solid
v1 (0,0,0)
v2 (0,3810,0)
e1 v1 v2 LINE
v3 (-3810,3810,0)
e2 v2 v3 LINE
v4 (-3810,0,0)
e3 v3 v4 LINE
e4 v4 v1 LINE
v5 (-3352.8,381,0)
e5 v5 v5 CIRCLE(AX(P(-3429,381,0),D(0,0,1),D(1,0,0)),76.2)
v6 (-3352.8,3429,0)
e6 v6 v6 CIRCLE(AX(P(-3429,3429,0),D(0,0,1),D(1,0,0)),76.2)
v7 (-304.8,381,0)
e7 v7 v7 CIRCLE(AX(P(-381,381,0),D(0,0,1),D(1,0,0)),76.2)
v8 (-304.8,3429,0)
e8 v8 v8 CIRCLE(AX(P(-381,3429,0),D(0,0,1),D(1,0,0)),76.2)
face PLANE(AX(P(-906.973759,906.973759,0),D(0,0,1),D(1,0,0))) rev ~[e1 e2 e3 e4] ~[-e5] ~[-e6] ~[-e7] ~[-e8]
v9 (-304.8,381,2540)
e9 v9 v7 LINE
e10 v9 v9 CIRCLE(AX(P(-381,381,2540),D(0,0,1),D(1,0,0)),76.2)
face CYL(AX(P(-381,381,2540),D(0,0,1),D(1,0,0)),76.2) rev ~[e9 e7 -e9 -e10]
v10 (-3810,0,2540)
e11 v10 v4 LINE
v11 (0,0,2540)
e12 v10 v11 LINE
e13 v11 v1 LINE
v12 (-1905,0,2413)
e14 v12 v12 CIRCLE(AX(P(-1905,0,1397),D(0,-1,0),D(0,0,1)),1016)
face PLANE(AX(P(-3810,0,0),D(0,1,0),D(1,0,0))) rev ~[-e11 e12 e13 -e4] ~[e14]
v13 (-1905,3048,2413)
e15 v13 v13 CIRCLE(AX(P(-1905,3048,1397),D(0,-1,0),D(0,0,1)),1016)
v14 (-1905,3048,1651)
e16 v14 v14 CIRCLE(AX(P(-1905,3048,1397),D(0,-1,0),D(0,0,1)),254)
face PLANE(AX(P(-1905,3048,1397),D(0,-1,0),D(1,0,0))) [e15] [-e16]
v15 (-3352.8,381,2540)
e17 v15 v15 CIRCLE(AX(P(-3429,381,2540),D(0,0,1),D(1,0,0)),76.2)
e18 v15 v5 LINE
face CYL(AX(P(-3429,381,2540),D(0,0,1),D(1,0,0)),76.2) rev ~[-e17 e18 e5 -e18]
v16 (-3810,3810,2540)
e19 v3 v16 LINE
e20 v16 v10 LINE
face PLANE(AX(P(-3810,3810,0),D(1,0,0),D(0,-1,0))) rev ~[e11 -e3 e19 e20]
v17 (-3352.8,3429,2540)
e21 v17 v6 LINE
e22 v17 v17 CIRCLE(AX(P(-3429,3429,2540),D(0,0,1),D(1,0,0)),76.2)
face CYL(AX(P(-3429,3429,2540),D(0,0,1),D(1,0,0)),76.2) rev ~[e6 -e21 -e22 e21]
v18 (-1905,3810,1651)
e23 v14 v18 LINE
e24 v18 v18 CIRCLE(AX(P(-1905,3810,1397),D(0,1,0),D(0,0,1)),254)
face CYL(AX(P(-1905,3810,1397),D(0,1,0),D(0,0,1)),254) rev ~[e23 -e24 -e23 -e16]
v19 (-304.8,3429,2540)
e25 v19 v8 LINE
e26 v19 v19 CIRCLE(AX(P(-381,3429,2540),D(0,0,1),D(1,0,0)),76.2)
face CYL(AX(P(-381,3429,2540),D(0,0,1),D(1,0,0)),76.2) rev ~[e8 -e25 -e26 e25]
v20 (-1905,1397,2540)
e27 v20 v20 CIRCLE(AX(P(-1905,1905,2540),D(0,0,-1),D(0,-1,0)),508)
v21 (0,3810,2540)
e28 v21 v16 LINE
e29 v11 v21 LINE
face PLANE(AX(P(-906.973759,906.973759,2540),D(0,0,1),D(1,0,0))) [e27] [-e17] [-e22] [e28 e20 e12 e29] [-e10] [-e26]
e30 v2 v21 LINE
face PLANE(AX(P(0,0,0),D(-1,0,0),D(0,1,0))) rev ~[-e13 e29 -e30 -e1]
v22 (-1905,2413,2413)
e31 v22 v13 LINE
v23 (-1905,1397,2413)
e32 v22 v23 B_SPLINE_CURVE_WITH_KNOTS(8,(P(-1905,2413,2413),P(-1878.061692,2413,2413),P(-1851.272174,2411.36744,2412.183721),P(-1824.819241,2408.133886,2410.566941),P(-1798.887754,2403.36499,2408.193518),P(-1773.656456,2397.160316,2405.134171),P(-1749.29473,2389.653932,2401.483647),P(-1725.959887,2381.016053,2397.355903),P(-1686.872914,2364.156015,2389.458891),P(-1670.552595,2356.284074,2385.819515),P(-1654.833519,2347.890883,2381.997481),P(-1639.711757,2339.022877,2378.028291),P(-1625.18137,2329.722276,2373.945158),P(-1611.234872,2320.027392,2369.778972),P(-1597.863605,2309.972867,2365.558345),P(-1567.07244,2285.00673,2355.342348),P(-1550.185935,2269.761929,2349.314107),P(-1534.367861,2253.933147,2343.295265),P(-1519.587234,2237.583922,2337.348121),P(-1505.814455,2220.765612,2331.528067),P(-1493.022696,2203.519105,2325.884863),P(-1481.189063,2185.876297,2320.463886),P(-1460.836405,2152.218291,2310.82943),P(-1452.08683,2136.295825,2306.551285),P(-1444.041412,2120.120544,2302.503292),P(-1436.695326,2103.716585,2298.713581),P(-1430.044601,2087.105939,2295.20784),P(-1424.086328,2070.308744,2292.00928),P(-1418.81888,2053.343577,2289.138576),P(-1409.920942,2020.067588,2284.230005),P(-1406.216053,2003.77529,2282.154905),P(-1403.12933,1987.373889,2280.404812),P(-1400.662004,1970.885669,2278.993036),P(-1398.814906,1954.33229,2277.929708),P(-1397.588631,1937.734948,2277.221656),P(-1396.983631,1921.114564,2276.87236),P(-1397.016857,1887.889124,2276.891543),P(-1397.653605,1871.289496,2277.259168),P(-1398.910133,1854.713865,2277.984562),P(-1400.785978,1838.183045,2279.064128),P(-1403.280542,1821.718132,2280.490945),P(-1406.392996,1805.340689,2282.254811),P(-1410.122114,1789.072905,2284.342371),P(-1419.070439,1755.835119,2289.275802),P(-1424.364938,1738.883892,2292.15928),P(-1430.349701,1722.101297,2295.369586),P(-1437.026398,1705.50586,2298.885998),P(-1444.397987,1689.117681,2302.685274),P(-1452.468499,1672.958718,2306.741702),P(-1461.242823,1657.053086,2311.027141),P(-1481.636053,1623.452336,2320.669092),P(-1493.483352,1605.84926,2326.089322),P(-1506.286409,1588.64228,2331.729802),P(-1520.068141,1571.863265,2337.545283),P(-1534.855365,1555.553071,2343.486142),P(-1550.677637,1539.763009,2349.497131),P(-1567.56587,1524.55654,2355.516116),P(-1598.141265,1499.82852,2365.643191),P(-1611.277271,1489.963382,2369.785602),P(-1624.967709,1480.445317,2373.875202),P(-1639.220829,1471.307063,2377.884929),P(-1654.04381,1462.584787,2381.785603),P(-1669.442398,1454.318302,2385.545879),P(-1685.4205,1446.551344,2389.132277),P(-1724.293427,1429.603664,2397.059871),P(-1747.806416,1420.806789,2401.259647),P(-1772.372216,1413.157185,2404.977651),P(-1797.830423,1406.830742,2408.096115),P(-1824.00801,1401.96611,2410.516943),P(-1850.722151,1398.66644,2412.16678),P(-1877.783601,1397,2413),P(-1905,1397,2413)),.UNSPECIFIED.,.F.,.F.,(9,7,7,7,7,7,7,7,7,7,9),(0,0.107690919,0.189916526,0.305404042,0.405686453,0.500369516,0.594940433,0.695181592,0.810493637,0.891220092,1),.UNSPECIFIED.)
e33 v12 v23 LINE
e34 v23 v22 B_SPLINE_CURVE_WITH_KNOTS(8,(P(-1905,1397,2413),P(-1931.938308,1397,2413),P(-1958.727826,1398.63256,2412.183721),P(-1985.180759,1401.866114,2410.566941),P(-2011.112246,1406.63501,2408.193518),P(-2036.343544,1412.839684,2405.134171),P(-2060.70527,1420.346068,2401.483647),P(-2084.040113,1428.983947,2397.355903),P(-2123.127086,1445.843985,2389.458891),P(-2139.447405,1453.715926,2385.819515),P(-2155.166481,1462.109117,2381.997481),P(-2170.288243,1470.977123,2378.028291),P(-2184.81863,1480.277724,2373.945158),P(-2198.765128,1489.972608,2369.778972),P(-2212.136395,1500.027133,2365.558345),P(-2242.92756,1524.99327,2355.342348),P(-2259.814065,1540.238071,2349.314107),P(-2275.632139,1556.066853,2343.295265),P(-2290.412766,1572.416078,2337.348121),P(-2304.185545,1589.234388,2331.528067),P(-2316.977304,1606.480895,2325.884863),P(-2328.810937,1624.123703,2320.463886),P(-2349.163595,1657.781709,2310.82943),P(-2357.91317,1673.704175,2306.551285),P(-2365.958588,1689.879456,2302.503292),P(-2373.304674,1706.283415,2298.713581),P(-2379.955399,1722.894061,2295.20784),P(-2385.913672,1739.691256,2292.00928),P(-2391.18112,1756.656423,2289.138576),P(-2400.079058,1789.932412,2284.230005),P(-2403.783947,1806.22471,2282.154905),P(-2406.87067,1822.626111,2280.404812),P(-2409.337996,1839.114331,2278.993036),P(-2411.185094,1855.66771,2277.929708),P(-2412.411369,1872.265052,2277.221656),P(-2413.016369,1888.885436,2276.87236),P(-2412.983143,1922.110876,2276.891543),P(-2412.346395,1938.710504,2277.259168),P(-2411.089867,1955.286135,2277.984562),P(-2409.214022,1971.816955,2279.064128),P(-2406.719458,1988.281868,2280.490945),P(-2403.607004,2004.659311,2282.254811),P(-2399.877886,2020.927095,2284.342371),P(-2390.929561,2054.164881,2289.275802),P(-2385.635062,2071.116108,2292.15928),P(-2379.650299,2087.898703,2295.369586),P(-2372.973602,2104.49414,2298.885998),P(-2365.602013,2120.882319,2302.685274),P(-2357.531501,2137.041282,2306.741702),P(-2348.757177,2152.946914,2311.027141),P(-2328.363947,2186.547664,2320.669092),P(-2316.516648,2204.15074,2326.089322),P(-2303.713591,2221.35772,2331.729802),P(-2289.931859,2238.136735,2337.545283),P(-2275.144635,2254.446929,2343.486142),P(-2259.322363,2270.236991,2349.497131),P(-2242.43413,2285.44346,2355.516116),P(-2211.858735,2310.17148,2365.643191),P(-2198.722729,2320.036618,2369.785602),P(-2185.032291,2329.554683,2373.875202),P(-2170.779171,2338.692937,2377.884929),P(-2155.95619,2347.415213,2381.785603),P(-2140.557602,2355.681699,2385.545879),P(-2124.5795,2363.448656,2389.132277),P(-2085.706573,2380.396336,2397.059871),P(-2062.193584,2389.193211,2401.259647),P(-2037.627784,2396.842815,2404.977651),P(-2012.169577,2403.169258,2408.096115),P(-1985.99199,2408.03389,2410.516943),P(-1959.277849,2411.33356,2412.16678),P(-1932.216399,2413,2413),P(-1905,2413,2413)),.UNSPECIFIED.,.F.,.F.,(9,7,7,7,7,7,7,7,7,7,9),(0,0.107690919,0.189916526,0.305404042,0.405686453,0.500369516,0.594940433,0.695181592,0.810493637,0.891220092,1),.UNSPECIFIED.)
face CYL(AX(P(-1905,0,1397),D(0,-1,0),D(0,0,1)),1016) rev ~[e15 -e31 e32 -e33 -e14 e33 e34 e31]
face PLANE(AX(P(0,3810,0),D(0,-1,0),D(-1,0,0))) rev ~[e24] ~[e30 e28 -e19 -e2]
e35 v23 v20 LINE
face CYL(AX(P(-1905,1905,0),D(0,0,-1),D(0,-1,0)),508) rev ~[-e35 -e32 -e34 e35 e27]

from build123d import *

# Parameters (mm, degrees)
F1_DEPTH  = 2540
F2_W      = 3810
F2_H      = 3810
F2_R      = 508
F3_DEPTH  = 762
F5_DEPTH  = 3048
F7_DEPTH  = 3810.0010001
F8_R      = 254
F9_DEPTH  = 508
F11_DEPTH = 2540.001


with BuildPart() as f1:
    # F0 (on Top) → F1 (new body)
    with BuildSketch(Plane.XY):
        with BuildLine():
            Line((-1905, 0), (0, 0))
            Line((0, 0), (0, 1905))
            Line((0, 1905), (-1397, 1905))
            ThreePointArc((-1397, 1905), (-1545.7897551572, 1545.7897551572), (-1905, 1397))
            Line((-1905, 1397), (-1905, 0))
        make_face()
        with BuildLine():
            Line((-3810, 0), (-1905, 0))
            Line((-1905, 0), (-1905, 1397))
            ThreePointArc((-1905, 1397), (-2264.2102448428, 2264.2102448428), (-1397, 1905))
            Line((-1397, 1905), (0, 1905))
            Line((0, 1905), (0, 3810))
            Line((0, 3810), (-3810, 3810))
            Line((-3810, 3810), (-3810, 0))
        make_face()
    extrude(amount=F1_DEPTH)

    # F2 (on face) → F3 (join)
    with BuildSketch(Plane(origin=(0, 0, 0), x_dir=(1, 0, 0), z_dir=(0, 0, -1))):
        with Locations((-1905, -1905)):
            Rectangle(F2_W, F2_H)
        with Locations((-1905, -1905)):
            Circle(F2_R, mode=Mode.SUBTRACT)
        with Locations((-1905, -1905)):
            Circle(F2_R)
    extrude(amount=-F3_DEPTH)

    # F4 (on face) → F5 (cut)
    with BuildSketch(Plane.XZ):
        with BuildLine():
            ThreePointArc((-889, 1397), (-1186.5795103145, 2115.4204896855), (-1905, 2413))
            ThreePointArc((-1905, 2413), (-2623.4204896855, 678.5795103145), (-889, 1397))
        make_face()
    extrude(amount=-F5_DEPTH, mode=Mode.SUBTRACT)

    # F6 (on face) → F7 (cut, through all)
    with BuildSketch(Plane(origin=(0, 3810, 0), x_dir=(-1, 0, 0), z_dir=(0, 1, 0))):
        with BuildLine():
            ThreePointArc((2159, 1397), (2084.6051224214, 1576.6051224214), (1905, 1651))
            ThreePointArc((1905, 1651), (1725.3948775786, 1217.3948775786), (2159, 1397))
        make_face()
    extrude(amount=-F7_DEPTH, mode=Mode.SUBTRACT)

    # F8 (on face) → F9 (cut)
    with BuildSketch(Plane.XZ.offset(-3048)):
        with Locations((-1905, 1397)):
            Circle(F8_R)
    extrude(amount=-F9_DEPTH, mode=Mode.SUBTRACT)

    # F10 (on face) → F11 (cut, through all)
    with BuildSketch(Plane.XY.offset(2540)):
        with BuildLine():
            ThreePointArc((-3352.8, 3429), (-3375.1184632736, 3482.8815367264), (-3429, 3505.2))
            Line((-3429, 3505.2), (-3429, 3429))
            Line((-3429, 3429), (-3429, 3352.8))
            ThreePointArc((-3429, 3352.8), (-3375.1184632736, 3375.1184632736), (-3352.8, 3429))
        make_face()
        with BuildLine():
            Line((-3429, 3429), (-3429, 3505.2))
            ThreePointArc((-3429, 3505.2), (-3505.2, 3429), (-3429, 3352.8))
            Line((-3429, 3352.8), (-3429, 3429))
        make_face()
        with BuildLine():
            ThreePointArc((-457.2, 3429), (-381, 3352.8), (-304.8, 3429))
            ThreePointArc((-304.8, 3429), (-381, 3505.2), (-457.2, 3429))
        make_face()
        with BuildLine():
            ThreePointArc((-457.2, 381), (-381, 304.8), (-304.8, 381))
            ThreePointArc((-304.8, 381), (-381, 457.2), (-457.2, 381))
        make_face()
        with BuildLine():
            ThreePointArc((-3429, 457.2), (-3482.8815367264, 327.1184632736), (-3352.8, 381))
            ThreePointArc((-3352.8, 381), (-3375.1184632736, 434.8815367264), (-3429, 457.2))
        make_face()
    extrude(amount=-F11_DEPTH, mode=Mode.SUBTRACT)


solid = f1.part
